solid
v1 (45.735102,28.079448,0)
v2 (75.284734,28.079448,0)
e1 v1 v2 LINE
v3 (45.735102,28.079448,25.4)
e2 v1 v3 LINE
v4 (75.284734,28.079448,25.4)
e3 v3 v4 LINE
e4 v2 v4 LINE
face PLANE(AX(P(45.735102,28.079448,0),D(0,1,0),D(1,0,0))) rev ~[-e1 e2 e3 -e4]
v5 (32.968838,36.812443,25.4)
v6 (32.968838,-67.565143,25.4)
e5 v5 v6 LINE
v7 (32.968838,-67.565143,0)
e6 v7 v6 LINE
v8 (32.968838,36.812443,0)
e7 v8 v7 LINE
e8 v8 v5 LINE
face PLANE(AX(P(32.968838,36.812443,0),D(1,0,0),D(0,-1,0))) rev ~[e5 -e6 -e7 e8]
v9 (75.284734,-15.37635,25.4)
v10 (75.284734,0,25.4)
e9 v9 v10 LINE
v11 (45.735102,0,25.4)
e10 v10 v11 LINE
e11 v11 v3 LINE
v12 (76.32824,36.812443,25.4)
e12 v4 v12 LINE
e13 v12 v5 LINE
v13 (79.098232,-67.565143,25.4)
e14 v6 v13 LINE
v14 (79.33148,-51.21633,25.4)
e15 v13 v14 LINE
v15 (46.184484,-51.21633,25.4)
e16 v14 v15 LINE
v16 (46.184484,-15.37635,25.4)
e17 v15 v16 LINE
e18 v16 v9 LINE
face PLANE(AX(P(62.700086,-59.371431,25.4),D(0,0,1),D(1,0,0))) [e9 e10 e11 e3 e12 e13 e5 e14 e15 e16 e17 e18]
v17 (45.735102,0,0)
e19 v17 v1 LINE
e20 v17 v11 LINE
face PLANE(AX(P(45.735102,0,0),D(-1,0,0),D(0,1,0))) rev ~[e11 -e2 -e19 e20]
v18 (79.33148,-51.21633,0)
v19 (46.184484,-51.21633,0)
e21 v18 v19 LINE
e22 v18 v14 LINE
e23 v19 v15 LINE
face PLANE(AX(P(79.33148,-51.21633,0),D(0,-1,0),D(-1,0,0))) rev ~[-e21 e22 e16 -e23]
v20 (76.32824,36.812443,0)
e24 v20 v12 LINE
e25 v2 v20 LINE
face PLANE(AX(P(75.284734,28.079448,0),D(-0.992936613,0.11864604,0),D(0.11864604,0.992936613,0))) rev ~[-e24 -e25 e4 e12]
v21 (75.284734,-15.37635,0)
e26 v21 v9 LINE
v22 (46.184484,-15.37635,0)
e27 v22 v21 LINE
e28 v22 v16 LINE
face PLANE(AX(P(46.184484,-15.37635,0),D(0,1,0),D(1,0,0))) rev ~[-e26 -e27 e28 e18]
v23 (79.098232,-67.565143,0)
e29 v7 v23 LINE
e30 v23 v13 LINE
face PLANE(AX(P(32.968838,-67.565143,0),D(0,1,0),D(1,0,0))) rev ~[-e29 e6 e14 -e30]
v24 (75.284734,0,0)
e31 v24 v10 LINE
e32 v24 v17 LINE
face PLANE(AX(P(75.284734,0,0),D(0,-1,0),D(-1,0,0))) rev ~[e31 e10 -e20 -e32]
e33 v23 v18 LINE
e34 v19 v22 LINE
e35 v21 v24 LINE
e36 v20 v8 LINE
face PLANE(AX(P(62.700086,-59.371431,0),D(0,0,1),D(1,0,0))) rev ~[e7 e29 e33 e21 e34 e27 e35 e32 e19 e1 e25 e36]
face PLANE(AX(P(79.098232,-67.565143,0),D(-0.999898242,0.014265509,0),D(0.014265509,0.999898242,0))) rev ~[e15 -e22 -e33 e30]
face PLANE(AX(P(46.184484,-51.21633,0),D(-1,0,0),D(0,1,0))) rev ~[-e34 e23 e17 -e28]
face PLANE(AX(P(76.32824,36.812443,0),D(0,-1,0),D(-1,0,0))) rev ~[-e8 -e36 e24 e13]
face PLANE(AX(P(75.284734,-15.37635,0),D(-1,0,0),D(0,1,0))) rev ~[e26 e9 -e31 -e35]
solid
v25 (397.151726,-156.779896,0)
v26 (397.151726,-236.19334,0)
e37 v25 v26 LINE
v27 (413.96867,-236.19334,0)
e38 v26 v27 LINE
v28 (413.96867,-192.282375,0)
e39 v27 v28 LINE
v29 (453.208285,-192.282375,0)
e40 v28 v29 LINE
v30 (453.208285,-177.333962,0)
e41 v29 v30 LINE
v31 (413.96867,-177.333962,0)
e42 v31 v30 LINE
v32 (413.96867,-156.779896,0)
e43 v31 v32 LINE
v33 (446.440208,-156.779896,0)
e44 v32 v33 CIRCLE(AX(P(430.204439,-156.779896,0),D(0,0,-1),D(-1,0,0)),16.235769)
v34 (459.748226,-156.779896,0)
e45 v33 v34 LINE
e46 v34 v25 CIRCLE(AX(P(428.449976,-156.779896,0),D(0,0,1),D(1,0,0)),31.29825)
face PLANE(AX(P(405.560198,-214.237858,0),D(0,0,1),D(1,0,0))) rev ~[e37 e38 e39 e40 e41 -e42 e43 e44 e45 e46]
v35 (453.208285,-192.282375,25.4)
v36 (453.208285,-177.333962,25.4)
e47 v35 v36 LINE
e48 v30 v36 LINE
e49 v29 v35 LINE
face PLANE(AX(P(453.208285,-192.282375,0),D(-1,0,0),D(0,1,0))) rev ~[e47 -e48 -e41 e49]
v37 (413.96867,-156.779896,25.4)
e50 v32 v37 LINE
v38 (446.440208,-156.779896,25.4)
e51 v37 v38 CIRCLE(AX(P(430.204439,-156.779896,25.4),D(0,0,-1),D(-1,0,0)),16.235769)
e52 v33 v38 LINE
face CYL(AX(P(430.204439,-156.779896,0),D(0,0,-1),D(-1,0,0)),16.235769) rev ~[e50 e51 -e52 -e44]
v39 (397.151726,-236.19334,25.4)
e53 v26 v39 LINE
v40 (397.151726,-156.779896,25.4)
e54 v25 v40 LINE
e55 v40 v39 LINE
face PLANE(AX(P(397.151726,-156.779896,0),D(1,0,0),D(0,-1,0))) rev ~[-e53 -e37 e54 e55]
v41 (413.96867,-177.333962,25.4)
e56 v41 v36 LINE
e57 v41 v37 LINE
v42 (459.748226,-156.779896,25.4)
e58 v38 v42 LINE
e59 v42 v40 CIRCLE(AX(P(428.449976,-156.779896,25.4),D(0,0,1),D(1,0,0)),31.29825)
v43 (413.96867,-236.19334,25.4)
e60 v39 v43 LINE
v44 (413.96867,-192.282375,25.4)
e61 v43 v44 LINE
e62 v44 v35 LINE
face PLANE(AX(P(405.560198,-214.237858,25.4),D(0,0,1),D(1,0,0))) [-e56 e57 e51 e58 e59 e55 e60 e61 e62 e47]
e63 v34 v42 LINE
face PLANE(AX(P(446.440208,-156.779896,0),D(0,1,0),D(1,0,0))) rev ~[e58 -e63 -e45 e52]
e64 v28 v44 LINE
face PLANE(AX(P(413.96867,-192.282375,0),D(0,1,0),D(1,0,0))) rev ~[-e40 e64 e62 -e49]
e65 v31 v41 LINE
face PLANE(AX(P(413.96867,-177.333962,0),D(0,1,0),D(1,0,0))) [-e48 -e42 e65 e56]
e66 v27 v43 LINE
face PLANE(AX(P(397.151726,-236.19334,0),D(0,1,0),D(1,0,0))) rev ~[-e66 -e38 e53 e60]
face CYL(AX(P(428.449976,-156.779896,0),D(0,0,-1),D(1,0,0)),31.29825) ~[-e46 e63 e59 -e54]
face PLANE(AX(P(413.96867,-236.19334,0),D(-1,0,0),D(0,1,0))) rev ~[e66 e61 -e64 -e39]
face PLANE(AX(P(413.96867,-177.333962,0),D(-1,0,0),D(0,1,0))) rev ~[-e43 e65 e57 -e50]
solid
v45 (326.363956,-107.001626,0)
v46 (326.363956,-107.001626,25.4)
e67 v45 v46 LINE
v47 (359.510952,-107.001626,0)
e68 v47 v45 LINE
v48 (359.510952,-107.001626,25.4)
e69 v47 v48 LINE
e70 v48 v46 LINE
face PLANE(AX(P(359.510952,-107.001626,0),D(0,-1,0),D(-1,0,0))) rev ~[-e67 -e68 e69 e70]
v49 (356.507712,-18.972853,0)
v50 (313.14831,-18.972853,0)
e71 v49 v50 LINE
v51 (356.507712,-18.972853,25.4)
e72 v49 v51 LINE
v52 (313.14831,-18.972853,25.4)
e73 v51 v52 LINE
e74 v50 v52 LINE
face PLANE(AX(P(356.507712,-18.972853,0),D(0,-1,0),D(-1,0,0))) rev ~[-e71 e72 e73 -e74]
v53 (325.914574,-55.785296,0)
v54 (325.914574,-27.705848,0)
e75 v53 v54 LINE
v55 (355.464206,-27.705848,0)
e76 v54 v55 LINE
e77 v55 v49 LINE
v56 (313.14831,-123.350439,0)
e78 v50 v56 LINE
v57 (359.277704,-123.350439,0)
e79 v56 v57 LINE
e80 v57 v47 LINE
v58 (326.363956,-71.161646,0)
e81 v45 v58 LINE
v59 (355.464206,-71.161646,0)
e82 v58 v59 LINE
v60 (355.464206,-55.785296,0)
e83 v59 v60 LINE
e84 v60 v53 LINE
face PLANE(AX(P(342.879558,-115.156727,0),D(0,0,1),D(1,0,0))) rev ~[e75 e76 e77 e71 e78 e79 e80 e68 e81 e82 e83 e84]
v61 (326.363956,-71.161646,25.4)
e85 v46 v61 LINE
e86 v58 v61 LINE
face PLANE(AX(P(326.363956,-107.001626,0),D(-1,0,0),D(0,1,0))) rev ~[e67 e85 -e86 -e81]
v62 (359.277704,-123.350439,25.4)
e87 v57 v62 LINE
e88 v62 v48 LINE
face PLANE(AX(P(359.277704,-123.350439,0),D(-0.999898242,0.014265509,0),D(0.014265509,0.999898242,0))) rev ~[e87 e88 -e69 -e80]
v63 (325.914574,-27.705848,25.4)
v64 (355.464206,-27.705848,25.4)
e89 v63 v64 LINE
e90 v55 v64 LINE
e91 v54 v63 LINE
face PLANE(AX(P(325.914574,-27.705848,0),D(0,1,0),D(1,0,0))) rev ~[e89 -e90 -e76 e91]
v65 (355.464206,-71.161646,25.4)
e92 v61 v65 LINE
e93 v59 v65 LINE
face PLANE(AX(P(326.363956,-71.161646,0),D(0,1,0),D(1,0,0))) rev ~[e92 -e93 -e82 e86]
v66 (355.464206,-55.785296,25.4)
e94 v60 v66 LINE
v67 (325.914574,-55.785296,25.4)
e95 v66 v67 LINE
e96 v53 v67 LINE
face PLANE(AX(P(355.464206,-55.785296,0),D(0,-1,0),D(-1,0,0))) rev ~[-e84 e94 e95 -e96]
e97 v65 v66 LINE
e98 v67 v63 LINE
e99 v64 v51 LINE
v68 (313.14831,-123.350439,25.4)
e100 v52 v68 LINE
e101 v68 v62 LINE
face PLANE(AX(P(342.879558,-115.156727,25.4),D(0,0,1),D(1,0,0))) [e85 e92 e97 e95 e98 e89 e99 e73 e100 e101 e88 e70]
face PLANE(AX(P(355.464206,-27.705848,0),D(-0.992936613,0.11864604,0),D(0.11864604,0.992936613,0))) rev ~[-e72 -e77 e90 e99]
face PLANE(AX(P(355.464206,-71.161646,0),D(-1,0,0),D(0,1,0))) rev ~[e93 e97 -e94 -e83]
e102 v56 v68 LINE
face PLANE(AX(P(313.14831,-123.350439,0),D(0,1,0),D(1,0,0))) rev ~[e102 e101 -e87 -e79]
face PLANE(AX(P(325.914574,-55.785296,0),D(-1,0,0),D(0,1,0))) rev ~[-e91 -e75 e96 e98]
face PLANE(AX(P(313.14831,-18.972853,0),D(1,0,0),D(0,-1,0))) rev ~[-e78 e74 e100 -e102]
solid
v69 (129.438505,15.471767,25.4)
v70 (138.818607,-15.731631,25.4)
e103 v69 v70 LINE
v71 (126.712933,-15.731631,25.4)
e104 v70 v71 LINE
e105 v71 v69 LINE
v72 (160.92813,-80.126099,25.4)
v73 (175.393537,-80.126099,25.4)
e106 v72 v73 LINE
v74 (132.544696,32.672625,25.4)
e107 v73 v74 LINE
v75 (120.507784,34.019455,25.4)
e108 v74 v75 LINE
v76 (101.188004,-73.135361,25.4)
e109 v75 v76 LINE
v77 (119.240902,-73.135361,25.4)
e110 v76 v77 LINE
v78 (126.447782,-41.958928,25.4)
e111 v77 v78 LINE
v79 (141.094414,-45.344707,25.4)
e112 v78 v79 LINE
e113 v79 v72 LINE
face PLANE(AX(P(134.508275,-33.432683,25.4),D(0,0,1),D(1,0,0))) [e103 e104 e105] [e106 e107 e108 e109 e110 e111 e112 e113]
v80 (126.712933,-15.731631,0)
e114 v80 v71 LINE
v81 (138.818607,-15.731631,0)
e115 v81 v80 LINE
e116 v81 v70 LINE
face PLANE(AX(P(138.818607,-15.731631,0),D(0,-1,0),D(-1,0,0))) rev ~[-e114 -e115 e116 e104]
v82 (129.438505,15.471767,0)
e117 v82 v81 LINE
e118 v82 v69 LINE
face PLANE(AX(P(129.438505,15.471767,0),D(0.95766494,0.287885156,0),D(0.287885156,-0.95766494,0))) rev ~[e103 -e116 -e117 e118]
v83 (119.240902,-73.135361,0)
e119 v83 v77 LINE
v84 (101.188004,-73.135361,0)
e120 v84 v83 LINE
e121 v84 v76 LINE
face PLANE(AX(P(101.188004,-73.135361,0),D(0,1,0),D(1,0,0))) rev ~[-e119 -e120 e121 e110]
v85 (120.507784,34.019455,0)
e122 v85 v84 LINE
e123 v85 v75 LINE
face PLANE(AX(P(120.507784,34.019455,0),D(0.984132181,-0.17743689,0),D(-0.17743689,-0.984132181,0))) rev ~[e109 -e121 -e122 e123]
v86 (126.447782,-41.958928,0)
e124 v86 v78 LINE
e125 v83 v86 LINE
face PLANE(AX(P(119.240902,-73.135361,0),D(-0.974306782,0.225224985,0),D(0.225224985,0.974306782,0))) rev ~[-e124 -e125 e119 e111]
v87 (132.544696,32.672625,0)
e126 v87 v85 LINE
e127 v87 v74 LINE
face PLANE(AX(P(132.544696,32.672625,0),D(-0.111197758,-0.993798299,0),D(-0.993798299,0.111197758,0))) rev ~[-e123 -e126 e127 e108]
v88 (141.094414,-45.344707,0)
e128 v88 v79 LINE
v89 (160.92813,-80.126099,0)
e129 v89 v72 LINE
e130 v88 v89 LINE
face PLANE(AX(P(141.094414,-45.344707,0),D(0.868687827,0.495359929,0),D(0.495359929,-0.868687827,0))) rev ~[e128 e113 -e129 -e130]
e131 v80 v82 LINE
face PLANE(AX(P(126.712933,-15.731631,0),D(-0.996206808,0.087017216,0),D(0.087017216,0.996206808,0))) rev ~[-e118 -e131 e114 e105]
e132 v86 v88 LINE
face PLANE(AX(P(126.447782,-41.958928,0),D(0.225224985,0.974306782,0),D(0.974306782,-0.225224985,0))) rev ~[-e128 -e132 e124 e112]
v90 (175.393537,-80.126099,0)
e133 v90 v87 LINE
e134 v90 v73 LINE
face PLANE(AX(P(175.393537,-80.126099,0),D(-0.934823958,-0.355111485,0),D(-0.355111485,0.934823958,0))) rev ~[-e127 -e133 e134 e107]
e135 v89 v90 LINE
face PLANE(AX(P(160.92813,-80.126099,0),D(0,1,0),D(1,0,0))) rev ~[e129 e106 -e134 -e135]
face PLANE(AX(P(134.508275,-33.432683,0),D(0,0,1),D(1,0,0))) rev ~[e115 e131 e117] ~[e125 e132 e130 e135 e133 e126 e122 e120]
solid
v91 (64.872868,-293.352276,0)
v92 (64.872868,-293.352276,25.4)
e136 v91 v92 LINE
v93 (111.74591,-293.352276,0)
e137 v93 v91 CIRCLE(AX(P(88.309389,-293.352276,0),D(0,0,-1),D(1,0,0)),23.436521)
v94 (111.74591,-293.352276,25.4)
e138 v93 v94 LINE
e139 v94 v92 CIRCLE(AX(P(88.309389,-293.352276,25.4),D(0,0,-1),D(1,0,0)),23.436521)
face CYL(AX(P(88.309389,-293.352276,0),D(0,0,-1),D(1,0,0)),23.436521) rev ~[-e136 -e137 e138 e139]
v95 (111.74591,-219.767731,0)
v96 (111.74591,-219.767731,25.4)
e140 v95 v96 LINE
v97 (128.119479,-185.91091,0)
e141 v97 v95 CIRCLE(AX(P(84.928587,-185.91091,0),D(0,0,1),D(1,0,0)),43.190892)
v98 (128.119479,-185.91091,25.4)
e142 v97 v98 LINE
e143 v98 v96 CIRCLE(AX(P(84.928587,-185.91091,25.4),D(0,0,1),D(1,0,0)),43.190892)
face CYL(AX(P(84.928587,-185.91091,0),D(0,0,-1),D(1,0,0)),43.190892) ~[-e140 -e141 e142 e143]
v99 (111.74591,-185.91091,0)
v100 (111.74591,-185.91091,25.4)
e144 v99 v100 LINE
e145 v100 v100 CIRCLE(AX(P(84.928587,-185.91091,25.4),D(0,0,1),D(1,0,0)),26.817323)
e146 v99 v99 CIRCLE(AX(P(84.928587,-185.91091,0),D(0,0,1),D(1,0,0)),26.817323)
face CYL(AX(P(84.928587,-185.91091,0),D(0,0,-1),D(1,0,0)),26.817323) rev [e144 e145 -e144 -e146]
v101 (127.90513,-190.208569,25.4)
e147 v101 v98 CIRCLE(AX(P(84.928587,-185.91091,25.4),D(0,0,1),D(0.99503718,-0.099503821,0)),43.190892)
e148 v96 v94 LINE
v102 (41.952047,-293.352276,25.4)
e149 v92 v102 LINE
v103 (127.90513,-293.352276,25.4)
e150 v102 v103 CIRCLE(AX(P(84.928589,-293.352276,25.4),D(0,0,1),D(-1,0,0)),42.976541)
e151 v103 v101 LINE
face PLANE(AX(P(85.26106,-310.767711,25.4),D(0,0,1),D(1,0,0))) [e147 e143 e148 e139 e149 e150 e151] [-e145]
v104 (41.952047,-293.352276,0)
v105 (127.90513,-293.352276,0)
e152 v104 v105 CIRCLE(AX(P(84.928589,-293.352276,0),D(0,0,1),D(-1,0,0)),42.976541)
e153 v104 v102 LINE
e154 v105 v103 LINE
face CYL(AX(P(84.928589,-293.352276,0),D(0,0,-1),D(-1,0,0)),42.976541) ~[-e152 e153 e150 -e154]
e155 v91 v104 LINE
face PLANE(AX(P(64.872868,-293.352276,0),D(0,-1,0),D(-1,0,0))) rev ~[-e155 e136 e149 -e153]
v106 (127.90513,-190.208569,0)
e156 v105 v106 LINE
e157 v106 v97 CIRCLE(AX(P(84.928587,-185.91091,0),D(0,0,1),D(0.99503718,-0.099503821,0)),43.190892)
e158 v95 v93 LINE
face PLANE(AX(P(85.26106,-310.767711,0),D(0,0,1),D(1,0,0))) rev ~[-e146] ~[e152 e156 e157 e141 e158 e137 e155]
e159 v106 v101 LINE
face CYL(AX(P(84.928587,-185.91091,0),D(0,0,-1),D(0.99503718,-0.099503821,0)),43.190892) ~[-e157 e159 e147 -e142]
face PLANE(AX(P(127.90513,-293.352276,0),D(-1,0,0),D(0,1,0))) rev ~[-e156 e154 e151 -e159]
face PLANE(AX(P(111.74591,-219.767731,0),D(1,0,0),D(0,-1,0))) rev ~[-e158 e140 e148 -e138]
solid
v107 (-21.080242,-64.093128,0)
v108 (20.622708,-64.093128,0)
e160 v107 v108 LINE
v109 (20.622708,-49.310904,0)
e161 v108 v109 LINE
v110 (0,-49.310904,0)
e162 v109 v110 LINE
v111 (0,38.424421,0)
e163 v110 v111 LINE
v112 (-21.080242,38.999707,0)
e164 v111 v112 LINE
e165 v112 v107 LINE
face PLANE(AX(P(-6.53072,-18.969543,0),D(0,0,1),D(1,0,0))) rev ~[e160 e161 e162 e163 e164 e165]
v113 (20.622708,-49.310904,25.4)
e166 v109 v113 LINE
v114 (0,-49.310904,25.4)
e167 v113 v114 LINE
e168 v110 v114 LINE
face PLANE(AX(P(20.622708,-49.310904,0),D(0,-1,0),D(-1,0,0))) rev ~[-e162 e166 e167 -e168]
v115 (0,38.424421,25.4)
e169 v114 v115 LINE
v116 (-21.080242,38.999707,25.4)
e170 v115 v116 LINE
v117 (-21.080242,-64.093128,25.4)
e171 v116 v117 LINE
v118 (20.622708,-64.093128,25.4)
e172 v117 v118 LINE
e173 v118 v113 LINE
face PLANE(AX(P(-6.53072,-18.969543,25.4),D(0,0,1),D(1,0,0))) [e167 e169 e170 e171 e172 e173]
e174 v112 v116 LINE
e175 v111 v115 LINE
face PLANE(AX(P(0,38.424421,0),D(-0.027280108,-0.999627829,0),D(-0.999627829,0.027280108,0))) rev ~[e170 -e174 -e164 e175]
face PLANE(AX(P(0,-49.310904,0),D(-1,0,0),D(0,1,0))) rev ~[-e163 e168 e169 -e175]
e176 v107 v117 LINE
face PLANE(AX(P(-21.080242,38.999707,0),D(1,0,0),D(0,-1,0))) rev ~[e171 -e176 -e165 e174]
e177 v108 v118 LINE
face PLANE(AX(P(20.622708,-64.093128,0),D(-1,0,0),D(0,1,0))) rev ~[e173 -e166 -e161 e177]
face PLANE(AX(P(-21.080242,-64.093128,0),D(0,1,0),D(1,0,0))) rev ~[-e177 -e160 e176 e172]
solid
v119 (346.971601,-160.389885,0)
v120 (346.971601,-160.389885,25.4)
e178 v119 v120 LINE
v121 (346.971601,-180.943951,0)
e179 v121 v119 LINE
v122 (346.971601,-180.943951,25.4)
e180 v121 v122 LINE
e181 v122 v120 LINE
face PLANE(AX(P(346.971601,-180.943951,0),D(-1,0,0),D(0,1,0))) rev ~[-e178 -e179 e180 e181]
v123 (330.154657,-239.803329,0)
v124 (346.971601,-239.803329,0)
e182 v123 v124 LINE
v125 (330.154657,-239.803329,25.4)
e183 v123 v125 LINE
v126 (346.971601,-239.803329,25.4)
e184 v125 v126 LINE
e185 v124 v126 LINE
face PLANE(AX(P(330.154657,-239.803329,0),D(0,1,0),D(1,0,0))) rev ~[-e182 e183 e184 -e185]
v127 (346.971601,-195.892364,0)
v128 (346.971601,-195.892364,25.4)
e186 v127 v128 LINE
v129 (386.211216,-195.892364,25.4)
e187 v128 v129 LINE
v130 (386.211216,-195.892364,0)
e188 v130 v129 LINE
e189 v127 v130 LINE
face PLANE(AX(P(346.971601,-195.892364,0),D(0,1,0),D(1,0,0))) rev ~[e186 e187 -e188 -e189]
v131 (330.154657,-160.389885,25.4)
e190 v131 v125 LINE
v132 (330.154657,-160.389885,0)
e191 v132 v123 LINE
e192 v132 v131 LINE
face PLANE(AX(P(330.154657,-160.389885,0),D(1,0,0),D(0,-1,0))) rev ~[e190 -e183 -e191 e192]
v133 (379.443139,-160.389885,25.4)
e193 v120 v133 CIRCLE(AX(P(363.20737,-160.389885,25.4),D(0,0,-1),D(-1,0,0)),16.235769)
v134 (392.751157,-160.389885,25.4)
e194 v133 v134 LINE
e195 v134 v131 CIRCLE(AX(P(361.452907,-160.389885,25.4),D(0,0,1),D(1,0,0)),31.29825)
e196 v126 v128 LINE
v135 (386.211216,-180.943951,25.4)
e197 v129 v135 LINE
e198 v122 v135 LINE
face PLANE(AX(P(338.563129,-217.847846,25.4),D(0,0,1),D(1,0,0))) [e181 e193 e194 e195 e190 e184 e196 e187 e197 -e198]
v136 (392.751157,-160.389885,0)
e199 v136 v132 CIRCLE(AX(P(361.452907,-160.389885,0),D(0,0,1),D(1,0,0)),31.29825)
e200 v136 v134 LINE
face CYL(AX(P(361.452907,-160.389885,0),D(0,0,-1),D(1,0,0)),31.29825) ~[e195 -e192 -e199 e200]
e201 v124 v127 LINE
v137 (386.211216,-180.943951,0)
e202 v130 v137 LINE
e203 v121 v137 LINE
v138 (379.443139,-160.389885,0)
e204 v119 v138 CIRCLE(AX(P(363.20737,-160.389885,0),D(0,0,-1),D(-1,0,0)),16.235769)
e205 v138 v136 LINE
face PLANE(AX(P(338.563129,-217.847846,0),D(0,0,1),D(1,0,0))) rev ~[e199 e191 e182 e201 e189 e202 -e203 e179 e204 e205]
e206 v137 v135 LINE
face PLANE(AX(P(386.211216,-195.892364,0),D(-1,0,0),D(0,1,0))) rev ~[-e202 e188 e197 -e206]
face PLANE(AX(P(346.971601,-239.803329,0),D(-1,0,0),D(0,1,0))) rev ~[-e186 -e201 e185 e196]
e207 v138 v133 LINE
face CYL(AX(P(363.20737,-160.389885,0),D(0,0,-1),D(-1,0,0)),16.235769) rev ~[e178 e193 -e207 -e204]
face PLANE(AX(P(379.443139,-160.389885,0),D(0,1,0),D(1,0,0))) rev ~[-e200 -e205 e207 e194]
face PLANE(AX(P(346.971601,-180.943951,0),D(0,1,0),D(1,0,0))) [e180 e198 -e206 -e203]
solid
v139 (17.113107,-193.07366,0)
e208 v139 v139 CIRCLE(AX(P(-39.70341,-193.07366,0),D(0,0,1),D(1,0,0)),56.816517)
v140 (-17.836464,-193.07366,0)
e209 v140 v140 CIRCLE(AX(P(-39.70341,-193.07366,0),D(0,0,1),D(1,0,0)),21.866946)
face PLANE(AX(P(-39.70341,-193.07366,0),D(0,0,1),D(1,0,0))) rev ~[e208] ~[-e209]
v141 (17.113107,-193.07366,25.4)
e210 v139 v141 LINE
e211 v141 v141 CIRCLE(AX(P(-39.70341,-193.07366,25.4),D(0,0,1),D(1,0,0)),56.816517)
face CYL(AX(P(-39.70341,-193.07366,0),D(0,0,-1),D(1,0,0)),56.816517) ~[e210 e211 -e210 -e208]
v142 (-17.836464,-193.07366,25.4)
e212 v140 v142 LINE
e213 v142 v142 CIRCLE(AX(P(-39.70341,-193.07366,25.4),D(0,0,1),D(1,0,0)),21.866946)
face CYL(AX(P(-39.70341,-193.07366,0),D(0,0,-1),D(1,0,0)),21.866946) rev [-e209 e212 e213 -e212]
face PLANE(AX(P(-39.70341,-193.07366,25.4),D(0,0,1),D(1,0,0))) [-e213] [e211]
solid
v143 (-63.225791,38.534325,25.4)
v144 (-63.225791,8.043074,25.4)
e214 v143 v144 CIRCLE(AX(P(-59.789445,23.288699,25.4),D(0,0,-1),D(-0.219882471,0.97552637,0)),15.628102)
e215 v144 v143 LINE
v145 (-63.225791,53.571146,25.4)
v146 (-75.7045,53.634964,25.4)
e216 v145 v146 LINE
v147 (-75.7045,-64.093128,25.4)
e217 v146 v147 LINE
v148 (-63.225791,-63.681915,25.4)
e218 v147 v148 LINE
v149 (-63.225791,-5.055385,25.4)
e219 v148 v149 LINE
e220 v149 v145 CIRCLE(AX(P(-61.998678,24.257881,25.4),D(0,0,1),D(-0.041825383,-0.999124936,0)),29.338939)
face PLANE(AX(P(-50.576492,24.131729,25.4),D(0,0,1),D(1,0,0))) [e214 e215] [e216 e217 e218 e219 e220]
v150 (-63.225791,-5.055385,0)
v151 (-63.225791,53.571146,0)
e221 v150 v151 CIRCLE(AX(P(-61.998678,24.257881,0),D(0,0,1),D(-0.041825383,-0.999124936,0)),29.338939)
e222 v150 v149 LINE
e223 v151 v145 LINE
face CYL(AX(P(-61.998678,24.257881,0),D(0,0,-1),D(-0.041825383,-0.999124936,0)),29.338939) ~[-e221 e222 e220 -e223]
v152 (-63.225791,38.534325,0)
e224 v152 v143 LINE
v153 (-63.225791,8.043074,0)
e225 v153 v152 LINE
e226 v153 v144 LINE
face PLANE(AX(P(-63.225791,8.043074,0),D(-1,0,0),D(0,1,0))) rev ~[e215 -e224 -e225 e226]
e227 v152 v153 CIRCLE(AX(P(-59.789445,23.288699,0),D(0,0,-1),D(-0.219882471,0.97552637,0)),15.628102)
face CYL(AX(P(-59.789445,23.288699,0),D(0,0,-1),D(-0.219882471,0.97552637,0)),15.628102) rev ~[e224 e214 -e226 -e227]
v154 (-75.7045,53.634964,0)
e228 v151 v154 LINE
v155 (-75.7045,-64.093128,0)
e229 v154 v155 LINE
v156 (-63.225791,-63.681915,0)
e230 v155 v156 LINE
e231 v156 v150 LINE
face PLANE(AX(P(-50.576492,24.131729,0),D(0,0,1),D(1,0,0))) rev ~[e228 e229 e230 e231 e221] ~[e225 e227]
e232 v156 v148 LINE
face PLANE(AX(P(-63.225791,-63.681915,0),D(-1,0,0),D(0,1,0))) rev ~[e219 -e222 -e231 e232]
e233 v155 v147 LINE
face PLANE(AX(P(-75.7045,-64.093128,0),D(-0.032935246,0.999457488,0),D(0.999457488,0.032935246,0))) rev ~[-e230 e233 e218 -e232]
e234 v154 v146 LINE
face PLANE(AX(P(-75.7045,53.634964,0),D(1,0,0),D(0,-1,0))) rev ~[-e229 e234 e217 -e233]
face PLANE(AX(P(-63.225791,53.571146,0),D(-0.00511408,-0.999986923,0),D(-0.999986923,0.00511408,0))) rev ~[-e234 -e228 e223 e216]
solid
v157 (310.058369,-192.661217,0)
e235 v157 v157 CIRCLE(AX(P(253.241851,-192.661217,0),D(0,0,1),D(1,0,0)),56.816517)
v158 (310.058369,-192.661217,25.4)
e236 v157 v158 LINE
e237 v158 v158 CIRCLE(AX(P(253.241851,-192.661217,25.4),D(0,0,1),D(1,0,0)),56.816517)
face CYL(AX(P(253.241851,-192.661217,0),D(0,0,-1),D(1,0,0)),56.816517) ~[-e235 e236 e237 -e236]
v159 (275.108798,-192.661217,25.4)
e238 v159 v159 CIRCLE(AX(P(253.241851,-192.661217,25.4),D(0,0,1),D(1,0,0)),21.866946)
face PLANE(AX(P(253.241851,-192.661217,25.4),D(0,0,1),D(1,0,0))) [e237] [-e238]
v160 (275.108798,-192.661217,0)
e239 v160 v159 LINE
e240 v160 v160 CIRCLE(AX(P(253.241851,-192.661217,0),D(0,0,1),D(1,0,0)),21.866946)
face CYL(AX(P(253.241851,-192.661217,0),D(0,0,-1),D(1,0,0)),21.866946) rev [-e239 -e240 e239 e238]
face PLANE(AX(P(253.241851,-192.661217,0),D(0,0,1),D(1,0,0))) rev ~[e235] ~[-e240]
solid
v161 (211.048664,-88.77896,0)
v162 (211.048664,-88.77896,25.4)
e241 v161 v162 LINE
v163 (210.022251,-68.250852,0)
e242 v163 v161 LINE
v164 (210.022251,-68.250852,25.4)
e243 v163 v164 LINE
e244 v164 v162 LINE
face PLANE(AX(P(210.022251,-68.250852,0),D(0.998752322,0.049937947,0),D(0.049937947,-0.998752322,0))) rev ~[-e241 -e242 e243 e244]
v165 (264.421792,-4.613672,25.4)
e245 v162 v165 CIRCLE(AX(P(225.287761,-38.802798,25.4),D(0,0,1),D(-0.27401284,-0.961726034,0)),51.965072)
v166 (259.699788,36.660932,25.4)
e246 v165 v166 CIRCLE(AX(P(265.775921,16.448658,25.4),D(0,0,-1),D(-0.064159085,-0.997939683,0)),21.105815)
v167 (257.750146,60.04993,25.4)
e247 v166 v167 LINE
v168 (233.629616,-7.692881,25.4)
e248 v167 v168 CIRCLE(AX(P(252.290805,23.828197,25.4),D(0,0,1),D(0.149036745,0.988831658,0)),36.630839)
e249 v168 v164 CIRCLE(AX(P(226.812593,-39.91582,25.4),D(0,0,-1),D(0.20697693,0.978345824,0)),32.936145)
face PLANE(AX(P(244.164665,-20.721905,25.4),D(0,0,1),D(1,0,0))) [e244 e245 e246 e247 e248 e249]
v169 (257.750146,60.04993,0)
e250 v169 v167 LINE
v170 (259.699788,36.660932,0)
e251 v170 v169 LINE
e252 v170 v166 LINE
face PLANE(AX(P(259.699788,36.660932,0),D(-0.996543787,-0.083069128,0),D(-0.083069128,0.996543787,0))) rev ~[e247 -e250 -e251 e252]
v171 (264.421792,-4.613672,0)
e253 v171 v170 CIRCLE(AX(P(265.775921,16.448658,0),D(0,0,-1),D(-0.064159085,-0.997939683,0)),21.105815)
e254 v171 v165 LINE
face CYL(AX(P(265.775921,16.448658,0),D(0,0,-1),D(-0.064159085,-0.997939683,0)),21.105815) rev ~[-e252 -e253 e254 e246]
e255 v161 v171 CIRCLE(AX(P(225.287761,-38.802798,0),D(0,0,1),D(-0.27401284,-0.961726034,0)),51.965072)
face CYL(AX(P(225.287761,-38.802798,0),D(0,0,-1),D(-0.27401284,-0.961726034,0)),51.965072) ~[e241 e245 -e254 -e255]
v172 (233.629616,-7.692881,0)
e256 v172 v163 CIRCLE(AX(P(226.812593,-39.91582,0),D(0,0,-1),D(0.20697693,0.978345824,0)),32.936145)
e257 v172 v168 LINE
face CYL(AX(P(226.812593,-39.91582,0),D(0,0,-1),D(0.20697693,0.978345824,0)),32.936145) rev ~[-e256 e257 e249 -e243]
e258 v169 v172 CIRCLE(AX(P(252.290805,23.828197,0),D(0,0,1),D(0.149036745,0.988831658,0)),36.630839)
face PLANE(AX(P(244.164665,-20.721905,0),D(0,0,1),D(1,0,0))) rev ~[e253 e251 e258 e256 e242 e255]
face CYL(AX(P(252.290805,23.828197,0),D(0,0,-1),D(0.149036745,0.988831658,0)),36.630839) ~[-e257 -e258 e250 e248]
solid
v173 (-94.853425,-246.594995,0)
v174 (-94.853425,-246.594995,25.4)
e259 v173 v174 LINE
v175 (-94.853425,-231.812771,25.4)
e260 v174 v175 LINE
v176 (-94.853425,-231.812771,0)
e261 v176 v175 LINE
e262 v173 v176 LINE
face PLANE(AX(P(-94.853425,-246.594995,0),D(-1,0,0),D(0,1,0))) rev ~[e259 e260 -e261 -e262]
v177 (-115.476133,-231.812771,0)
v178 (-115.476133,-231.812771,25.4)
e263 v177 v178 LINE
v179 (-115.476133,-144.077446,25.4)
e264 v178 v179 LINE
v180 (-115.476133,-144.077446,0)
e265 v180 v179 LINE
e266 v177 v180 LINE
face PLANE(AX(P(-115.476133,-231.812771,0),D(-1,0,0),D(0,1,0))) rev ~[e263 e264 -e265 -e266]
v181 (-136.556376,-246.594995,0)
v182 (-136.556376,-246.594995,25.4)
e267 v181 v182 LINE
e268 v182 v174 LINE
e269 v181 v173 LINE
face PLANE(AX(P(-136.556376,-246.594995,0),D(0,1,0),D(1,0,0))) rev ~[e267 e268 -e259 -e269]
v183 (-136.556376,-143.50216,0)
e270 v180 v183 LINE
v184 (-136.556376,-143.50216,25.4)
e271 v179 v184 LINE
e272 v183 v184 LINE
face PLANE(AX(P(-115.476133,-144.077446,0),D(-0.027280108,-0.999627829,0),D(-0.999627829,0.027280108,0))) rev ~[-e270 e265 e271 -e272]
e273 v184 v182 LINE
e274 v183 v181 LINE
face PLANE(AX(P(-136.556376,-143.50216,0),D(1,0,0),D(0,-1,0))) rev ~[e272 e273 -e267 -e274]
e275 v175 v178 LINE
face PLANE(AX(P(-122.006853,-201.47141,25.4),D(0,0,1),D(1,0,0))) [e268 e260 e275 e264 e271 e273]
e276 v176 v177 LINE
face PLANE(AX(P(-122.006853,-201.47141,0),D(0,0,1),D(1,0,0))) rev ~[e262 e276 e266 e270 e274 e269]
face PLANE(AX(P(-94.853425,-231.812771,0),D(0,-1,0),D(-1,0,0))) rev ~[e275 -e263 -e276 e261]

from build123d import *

# Parameters (mm, degrees)
F1_DEPTH = 25.4
F0_R     = 56.8165173198
F0_R_2   = 21.8669462393
F0_R_3   = 26.817322963
F0_W     = 16.8169438839
F0_H     = 43.9109653234
F0_W_2   = 39.239615202
F0_H_2   = 14.948412776
F0_H_3   = 20.5540657043


# Not quite as in the source:
# - a feature names something its author has since deleted; it is built from what else it names


with BuildPart() as f1:
    # F0 (on Top) → F1 (new body)
    with BuildSketch(Plane.XY):
        Polygon((0, 38.4244211018), (-21.0802424699, 38.9997065067), (-21.0802424699, -64.0931278467), (20.6227079034, -64.0931278467), (20.6227079034, -49.3109039962), (0, -49.3109039962), align=None)
    extrude(amount=F1_DEPTH)


with BuildPart() as f1b:
    # F0 (on Top) → F1, piece 2 (new body)
    with BuildSketch(Plane.XY):
        Polygon((-115.4761333019, -144.0774456908), (-136.5563757718, -143.5021602859), (-136.5563757718, -246.5949946394), (-94.8534253985, -246.5949946394), (-94.8534253985, -231.8127707889), (-115.4761333019, -231.8127707889), align=None)
    extrude(amount=F1_DEPTH)


with BuildPart() as f1c:
    # F0 (on Top) → F1, piece 3 (new body)
    with BuildSketch(Plane.XY):
        with BuildLine():
            ThreePointArc((-63.2257908583, -5.0553847104), (-32.6597396912, 24.2578806356), (-63.2257908583, 53.5711459816))
            Line((-63.2257908583, 53.5711459816), (-63.2257908583, 38.5343246162))
            ThreePointArc((-63.2257908583, 38.5343246162), (-44.1613435888, 23.2886993326), (-63.2257908583, 8.0430740491))
            Line((-63.2257908583, 8.0430740491), (-63.2257908583, -5.0553847104))
        make_face()
        Polygon((-63.2257908583, 38.5343246162), (-63.2257908583, 53.5711459816), (-75.7045000792, 53.6349639297), (-75.7045000792, -64.0931278467), (-63.2257908583, -63.6819154024), (-63.2257908583, -5.0553847104), (-63.2257908583, 8.0430740491), align=None)
    extrude(amount=F1_DEPTH)


with BuildPart() as f1d:
    # F0 (on Top) → F1, piece 4 (new body)
    with BuildSketch(Plane.XY):
        Polygon((46.1844839156, -51.2163303792), (46.1844839156, -67.5651431084), (79.0982320905, -67.5651431084), (79.3314799666, -51.2163303792), align=None)
        Polygon((76.328240335, 36.8124432862), (45.7351021469, 36.8124432862), (45.7351021469, 28.0794482678), (75.2847343683, 28.0794482678), align=None)
        Polygon((45.7351021469, 36.8124432862), (32.9688377678, 36.8124432862), (32.9688377678, 0), (45.7351021469, 0), (45.7351021469, 28.0794482678), align=None)
        Polygon((45.7351021469, 0), (32.9688377678, 0), (32.9688377678, -15.3763499111), (46.1844839156, -15.3763499111), (75.2847343683, -15.3763499111), (75.2847343683, 0), align=None)
        Polygon((46.1844839156, -15.3763499111), (32.9688377678, -15.3763499111), (32.9688377678, -67.5651431084), (46.1844839156, -67.5651431084), (46.1844839156, -51.2163303792), align=None)
    extrude(amount=F1_DEPTH)


with BuildPart() as f1e:
    # F0 (on Top) → F1, piece 5 (new body)
    with BuildSketch(Plane.XY):
        Polygon((132.544696331, 32.672625035), (120.5077841878, 34.0194553137), (101.1880040169, -73.1353610754), (119.2409023643, -73.1353610754), (126.4477819204, -41.9589281082), (141.0944137755, -45.3447070969), (160.9281301498, -80.1260992885), (175.3935366869, -80.1260992885), align=None)
        Polygon((138.8186067343, -15.7316308469), (126.7129331827, -15.7316308469), (129.4385045767, 15.4717667028), align=None, mode=Mode.SUBTRACT)
    extrude(amount=F1_DEPTH)


with BuildPart() as f1f:
    # F0 (on Top) → F1, piece 6 (new body)
    with BuildSketch(Plane.XY):
        Polygon((326.3639559736, -107.0016261656), (326.3639559736, -123.3504388947), (359.2777041486, -123.3504388947), (359.5109520247, -107.0016261656), align=None)
        Polygon((356.5077123931, -18.9728525002), (325.9145742049, -18.9728525002), (325.9145742049, -27.7058475185), (355.4642064264, -27.7058475185), align=None)
        Polygon((325.9145742049, -18.9728525002), (313.1483098259, -18.9728525002), (313.1483098259, -55.7852957863), (325.9145742049, -55.7852957863), (325.9145742049, -27.7058475185), align=None)
        Polygon((325.9145742049, -55.7852957863), (313.1483098259, -55.7852957863), (313.1483098259, -71.1616456974), (326.3639559736, -71.1616456974), (355.4642064264, -71.1616456974), (355.4642064264, -55.7852957863), align=None)
        Polygon((326.3639559736, -71.1616456974), (313.1483098259, -71.1616456974), (313.1483098259, -123.3504388947), (326.3639559736, -123.3504388947), (326.3639559736, -107.0016261656), align=None)
    extrude(amount=F1_DEPTH)


with BuildPart() as f1g:
    # F0 (on Top) → F1, piece 7 (new body)
    with BuildSketch(Plane.XY):
        with Locations((-39.7034101188, -193.0736601353)):
            Circle(F0_R)
        with Locations((-39.7034101188, -193.0736601353)):
            Circle(F0_R_2, mode=Mode.SUBTRACT)
    extrude(amount=F1_DEPTH)


with BuildPart() as f1h:
    # F0 (on Top) → F1, piece 8 (new body)
    with BuildSketch(Plane.XY):
        with BuildLine():
            Line((127.9051303864, -293.3522760868), (111.7459100421, -293.3522760868))
            ThreePointArc((111.7459100421, -293.3522760868), (88.3093892006, -316.7887969283), (64.8728683591, -293.3522760868))
            Line((64.8728683591, -293.3522760868), (41.952047497, -293.3522760868))
            ThreePointArc((41.952047497, -293.3522760868), (84.9285889417, -336.3288175315), (127.9051303864, -293.3522760868))
        make_face()
        with BuildLine():
            Line((111.7459100421, -185.910910368), (111.7459100421, -219.7677314667))
            ThreePointArc((111.7459100421, -219.7677314667), (122.8262382091, -206.6285643046), (127.9051303864, -190.208569169))
            Line((127.9051303864, -190.208569169), (127.9051303864, -185.910910368))
            Line((127.9051303864, -185.910910368), (111.7459100421, -185.910910368))
        make_face()
        with BuildLine():
            ThreePointArc((127.9051303864, -190.208569169), (122.8262382091, -206.6285643046), (111.7459100421, -219.7677314667))
            Line((111.7459100421, -219.7677314667), (111.7459100421, -293.3522760868))
            Line((111.7459100421, -293.3522760868), (127.9051303864, -293.3522760868))
            Line((127.9051303864, -293.3522760868), (127.9051303864, -190.208569169))
        make_face()
        with BuildLine():
            ThreePointArc((127.9051303864, -190.208569169), (128.0658585701, -188.0624108039), (128.1194790103, -185.910910368))
            ThreePointArc((128.1194790103, -185.910910368), (46.0459608573, -167.1068011384), (111.7459100421, -219.7677314667))
            Line((111.7459100421, -219.7677314667), (111.7459100421, -185.910910368))
            Line((111.7459100421, -185.910910368), (127.9051303864, -185.910910368))
            Line((127.9051303864, -185.910910368), (127.9051303864, -190.208569169))
        make_face()
        with Locations((84.928587079, -185.910910368)):
            Circle(F0_R_3, mode=Mode.SUBTRACT)
    extrude(amount=F1_DEPTH)


with BuildPart() as f1i:
    # F0 (on Top) → F1, piece 9 (new body)
    with BuildSketch(Plane.XY):
        with Locations((253.241851305, -192.6612166895)):
            Circle(F0_R)
        with Locations((253.241851305, -192.6612166895)):
            Circle(F0_R_2, mode=Mode.SUBTRACT)
    extrude(amount=F1_DEPTH)


with BuildPart() as f1j:
    # F0 (on Top) → F1, piece 10 (new body)
    with BuildSketch(Plane.XY):
        with Locations((338.5631293058, -217.8478464484)):
            Rectangle(F0_W, F0_H)
        with BuildLine():
            ThreePointArc((392.7511572838, -160.3898853064), (361.4529073238, -129.0916353464), (330.1546573639, -160.3898853064))
            Line((330.1546573639, -160.3898853064), (346.9716012478, -160.3898853064))
            ThreePointArc((346.9716012478, -160.3898853064), (363.2073700428, -144.1541165113), (379.4431388378, -160.3898853064))
            Line((379.4431388378, -160.3898853064), (392.7511572838, -160.3898853064))
        make_face()
        with Locations((366.5914088488, -188.4181573987)):
            Rectangle(F0_W_2, F0_H_2)
        with Locations((338.5631293058, -170.6669181585)):
            Rectangle(F0_W, F0_H_3)
        with Locations((338.5631293058, -188.4181573987)):
            Rectangle(F0_W, F0_H_2)
    extrude(amount=F1_DEPTH)


with BuildPart() as f1k:
    # F0 (on Top) → F1, piece 11 (new body)
    with BuildSketch(Plane.XY):
        with Locations((405.560197978, -214.2378575618)):
            Rectangle(F0_W, F0_H)
        with BuildLine():
            ThreePointArc((459.748225956, -156.7798964198), (428.449975996, -125.4816464598), (397.1517260361, -156.7798964198))
            Line((397.1517260361, -156.7798964198), (413.96866992, -156.7798964198))
            ThreePointArc((413.96866992, -156.7798964198), (430.204438715, -140.5441276248), (446.44020751, -156.7798964198))
            Line((446.44020751, -156.7798964198), (459.748225956, -156.7798964198))
        make_face()
        with Locations((433.588477521, -184.8081685121)):
            Rectangle(F0_W_2, F0_H_2)
        with Locations((405.560197978, -167.0569292719)):
            Rectangle(F0_W, F0_H_3)
        with Locations((405.560197978, -184.8081685121)):
            Rectangle(F0_W, F0_H_2)
    extrude(amount=F1_DEPTH)


with BuildPart() as f1l:
    # F0 (on Top) → F1, piece 12 (new body)
    with BuildSketch(Plane.XY):
        with BuildLine():
            Line((259.6997884058, 36.6609323504), (257.7501463465, 60.0499304928))
            ThreePointArc((257.7501463465, 60.0499304928), (217.7821931165, 36.1153467221), (233.6296155648, -7.692880672))
            ThreePointArc((233.6296155648, -7.692880672), (257.4994597468, -51.8785067865), (210.0222513706, -68.2508524094))
            Line((210.0222513706, -68.2508524094), (211.0486635561, -88.7789601735))
            ThreePointArc((211.0486635561, -88.7789601735), (269.1727052446, -66.6322843389), (264.4217915855, -4.6136718735))
            ThreePointArc((264.4217915855, -4.6136718735), (244.806886102, 14.0497048531), (259.6997884058, 36.6609323504))
        make_face()
    extrude(amount=F1_DEPTH)


solid = Compound([f1.part, f1b.part, f1c.part, f1d.part, f1e.part, f1f.part, f1g.part, f1h.part, f1i.part, f1j.part, f1k.part, f1l.part])
